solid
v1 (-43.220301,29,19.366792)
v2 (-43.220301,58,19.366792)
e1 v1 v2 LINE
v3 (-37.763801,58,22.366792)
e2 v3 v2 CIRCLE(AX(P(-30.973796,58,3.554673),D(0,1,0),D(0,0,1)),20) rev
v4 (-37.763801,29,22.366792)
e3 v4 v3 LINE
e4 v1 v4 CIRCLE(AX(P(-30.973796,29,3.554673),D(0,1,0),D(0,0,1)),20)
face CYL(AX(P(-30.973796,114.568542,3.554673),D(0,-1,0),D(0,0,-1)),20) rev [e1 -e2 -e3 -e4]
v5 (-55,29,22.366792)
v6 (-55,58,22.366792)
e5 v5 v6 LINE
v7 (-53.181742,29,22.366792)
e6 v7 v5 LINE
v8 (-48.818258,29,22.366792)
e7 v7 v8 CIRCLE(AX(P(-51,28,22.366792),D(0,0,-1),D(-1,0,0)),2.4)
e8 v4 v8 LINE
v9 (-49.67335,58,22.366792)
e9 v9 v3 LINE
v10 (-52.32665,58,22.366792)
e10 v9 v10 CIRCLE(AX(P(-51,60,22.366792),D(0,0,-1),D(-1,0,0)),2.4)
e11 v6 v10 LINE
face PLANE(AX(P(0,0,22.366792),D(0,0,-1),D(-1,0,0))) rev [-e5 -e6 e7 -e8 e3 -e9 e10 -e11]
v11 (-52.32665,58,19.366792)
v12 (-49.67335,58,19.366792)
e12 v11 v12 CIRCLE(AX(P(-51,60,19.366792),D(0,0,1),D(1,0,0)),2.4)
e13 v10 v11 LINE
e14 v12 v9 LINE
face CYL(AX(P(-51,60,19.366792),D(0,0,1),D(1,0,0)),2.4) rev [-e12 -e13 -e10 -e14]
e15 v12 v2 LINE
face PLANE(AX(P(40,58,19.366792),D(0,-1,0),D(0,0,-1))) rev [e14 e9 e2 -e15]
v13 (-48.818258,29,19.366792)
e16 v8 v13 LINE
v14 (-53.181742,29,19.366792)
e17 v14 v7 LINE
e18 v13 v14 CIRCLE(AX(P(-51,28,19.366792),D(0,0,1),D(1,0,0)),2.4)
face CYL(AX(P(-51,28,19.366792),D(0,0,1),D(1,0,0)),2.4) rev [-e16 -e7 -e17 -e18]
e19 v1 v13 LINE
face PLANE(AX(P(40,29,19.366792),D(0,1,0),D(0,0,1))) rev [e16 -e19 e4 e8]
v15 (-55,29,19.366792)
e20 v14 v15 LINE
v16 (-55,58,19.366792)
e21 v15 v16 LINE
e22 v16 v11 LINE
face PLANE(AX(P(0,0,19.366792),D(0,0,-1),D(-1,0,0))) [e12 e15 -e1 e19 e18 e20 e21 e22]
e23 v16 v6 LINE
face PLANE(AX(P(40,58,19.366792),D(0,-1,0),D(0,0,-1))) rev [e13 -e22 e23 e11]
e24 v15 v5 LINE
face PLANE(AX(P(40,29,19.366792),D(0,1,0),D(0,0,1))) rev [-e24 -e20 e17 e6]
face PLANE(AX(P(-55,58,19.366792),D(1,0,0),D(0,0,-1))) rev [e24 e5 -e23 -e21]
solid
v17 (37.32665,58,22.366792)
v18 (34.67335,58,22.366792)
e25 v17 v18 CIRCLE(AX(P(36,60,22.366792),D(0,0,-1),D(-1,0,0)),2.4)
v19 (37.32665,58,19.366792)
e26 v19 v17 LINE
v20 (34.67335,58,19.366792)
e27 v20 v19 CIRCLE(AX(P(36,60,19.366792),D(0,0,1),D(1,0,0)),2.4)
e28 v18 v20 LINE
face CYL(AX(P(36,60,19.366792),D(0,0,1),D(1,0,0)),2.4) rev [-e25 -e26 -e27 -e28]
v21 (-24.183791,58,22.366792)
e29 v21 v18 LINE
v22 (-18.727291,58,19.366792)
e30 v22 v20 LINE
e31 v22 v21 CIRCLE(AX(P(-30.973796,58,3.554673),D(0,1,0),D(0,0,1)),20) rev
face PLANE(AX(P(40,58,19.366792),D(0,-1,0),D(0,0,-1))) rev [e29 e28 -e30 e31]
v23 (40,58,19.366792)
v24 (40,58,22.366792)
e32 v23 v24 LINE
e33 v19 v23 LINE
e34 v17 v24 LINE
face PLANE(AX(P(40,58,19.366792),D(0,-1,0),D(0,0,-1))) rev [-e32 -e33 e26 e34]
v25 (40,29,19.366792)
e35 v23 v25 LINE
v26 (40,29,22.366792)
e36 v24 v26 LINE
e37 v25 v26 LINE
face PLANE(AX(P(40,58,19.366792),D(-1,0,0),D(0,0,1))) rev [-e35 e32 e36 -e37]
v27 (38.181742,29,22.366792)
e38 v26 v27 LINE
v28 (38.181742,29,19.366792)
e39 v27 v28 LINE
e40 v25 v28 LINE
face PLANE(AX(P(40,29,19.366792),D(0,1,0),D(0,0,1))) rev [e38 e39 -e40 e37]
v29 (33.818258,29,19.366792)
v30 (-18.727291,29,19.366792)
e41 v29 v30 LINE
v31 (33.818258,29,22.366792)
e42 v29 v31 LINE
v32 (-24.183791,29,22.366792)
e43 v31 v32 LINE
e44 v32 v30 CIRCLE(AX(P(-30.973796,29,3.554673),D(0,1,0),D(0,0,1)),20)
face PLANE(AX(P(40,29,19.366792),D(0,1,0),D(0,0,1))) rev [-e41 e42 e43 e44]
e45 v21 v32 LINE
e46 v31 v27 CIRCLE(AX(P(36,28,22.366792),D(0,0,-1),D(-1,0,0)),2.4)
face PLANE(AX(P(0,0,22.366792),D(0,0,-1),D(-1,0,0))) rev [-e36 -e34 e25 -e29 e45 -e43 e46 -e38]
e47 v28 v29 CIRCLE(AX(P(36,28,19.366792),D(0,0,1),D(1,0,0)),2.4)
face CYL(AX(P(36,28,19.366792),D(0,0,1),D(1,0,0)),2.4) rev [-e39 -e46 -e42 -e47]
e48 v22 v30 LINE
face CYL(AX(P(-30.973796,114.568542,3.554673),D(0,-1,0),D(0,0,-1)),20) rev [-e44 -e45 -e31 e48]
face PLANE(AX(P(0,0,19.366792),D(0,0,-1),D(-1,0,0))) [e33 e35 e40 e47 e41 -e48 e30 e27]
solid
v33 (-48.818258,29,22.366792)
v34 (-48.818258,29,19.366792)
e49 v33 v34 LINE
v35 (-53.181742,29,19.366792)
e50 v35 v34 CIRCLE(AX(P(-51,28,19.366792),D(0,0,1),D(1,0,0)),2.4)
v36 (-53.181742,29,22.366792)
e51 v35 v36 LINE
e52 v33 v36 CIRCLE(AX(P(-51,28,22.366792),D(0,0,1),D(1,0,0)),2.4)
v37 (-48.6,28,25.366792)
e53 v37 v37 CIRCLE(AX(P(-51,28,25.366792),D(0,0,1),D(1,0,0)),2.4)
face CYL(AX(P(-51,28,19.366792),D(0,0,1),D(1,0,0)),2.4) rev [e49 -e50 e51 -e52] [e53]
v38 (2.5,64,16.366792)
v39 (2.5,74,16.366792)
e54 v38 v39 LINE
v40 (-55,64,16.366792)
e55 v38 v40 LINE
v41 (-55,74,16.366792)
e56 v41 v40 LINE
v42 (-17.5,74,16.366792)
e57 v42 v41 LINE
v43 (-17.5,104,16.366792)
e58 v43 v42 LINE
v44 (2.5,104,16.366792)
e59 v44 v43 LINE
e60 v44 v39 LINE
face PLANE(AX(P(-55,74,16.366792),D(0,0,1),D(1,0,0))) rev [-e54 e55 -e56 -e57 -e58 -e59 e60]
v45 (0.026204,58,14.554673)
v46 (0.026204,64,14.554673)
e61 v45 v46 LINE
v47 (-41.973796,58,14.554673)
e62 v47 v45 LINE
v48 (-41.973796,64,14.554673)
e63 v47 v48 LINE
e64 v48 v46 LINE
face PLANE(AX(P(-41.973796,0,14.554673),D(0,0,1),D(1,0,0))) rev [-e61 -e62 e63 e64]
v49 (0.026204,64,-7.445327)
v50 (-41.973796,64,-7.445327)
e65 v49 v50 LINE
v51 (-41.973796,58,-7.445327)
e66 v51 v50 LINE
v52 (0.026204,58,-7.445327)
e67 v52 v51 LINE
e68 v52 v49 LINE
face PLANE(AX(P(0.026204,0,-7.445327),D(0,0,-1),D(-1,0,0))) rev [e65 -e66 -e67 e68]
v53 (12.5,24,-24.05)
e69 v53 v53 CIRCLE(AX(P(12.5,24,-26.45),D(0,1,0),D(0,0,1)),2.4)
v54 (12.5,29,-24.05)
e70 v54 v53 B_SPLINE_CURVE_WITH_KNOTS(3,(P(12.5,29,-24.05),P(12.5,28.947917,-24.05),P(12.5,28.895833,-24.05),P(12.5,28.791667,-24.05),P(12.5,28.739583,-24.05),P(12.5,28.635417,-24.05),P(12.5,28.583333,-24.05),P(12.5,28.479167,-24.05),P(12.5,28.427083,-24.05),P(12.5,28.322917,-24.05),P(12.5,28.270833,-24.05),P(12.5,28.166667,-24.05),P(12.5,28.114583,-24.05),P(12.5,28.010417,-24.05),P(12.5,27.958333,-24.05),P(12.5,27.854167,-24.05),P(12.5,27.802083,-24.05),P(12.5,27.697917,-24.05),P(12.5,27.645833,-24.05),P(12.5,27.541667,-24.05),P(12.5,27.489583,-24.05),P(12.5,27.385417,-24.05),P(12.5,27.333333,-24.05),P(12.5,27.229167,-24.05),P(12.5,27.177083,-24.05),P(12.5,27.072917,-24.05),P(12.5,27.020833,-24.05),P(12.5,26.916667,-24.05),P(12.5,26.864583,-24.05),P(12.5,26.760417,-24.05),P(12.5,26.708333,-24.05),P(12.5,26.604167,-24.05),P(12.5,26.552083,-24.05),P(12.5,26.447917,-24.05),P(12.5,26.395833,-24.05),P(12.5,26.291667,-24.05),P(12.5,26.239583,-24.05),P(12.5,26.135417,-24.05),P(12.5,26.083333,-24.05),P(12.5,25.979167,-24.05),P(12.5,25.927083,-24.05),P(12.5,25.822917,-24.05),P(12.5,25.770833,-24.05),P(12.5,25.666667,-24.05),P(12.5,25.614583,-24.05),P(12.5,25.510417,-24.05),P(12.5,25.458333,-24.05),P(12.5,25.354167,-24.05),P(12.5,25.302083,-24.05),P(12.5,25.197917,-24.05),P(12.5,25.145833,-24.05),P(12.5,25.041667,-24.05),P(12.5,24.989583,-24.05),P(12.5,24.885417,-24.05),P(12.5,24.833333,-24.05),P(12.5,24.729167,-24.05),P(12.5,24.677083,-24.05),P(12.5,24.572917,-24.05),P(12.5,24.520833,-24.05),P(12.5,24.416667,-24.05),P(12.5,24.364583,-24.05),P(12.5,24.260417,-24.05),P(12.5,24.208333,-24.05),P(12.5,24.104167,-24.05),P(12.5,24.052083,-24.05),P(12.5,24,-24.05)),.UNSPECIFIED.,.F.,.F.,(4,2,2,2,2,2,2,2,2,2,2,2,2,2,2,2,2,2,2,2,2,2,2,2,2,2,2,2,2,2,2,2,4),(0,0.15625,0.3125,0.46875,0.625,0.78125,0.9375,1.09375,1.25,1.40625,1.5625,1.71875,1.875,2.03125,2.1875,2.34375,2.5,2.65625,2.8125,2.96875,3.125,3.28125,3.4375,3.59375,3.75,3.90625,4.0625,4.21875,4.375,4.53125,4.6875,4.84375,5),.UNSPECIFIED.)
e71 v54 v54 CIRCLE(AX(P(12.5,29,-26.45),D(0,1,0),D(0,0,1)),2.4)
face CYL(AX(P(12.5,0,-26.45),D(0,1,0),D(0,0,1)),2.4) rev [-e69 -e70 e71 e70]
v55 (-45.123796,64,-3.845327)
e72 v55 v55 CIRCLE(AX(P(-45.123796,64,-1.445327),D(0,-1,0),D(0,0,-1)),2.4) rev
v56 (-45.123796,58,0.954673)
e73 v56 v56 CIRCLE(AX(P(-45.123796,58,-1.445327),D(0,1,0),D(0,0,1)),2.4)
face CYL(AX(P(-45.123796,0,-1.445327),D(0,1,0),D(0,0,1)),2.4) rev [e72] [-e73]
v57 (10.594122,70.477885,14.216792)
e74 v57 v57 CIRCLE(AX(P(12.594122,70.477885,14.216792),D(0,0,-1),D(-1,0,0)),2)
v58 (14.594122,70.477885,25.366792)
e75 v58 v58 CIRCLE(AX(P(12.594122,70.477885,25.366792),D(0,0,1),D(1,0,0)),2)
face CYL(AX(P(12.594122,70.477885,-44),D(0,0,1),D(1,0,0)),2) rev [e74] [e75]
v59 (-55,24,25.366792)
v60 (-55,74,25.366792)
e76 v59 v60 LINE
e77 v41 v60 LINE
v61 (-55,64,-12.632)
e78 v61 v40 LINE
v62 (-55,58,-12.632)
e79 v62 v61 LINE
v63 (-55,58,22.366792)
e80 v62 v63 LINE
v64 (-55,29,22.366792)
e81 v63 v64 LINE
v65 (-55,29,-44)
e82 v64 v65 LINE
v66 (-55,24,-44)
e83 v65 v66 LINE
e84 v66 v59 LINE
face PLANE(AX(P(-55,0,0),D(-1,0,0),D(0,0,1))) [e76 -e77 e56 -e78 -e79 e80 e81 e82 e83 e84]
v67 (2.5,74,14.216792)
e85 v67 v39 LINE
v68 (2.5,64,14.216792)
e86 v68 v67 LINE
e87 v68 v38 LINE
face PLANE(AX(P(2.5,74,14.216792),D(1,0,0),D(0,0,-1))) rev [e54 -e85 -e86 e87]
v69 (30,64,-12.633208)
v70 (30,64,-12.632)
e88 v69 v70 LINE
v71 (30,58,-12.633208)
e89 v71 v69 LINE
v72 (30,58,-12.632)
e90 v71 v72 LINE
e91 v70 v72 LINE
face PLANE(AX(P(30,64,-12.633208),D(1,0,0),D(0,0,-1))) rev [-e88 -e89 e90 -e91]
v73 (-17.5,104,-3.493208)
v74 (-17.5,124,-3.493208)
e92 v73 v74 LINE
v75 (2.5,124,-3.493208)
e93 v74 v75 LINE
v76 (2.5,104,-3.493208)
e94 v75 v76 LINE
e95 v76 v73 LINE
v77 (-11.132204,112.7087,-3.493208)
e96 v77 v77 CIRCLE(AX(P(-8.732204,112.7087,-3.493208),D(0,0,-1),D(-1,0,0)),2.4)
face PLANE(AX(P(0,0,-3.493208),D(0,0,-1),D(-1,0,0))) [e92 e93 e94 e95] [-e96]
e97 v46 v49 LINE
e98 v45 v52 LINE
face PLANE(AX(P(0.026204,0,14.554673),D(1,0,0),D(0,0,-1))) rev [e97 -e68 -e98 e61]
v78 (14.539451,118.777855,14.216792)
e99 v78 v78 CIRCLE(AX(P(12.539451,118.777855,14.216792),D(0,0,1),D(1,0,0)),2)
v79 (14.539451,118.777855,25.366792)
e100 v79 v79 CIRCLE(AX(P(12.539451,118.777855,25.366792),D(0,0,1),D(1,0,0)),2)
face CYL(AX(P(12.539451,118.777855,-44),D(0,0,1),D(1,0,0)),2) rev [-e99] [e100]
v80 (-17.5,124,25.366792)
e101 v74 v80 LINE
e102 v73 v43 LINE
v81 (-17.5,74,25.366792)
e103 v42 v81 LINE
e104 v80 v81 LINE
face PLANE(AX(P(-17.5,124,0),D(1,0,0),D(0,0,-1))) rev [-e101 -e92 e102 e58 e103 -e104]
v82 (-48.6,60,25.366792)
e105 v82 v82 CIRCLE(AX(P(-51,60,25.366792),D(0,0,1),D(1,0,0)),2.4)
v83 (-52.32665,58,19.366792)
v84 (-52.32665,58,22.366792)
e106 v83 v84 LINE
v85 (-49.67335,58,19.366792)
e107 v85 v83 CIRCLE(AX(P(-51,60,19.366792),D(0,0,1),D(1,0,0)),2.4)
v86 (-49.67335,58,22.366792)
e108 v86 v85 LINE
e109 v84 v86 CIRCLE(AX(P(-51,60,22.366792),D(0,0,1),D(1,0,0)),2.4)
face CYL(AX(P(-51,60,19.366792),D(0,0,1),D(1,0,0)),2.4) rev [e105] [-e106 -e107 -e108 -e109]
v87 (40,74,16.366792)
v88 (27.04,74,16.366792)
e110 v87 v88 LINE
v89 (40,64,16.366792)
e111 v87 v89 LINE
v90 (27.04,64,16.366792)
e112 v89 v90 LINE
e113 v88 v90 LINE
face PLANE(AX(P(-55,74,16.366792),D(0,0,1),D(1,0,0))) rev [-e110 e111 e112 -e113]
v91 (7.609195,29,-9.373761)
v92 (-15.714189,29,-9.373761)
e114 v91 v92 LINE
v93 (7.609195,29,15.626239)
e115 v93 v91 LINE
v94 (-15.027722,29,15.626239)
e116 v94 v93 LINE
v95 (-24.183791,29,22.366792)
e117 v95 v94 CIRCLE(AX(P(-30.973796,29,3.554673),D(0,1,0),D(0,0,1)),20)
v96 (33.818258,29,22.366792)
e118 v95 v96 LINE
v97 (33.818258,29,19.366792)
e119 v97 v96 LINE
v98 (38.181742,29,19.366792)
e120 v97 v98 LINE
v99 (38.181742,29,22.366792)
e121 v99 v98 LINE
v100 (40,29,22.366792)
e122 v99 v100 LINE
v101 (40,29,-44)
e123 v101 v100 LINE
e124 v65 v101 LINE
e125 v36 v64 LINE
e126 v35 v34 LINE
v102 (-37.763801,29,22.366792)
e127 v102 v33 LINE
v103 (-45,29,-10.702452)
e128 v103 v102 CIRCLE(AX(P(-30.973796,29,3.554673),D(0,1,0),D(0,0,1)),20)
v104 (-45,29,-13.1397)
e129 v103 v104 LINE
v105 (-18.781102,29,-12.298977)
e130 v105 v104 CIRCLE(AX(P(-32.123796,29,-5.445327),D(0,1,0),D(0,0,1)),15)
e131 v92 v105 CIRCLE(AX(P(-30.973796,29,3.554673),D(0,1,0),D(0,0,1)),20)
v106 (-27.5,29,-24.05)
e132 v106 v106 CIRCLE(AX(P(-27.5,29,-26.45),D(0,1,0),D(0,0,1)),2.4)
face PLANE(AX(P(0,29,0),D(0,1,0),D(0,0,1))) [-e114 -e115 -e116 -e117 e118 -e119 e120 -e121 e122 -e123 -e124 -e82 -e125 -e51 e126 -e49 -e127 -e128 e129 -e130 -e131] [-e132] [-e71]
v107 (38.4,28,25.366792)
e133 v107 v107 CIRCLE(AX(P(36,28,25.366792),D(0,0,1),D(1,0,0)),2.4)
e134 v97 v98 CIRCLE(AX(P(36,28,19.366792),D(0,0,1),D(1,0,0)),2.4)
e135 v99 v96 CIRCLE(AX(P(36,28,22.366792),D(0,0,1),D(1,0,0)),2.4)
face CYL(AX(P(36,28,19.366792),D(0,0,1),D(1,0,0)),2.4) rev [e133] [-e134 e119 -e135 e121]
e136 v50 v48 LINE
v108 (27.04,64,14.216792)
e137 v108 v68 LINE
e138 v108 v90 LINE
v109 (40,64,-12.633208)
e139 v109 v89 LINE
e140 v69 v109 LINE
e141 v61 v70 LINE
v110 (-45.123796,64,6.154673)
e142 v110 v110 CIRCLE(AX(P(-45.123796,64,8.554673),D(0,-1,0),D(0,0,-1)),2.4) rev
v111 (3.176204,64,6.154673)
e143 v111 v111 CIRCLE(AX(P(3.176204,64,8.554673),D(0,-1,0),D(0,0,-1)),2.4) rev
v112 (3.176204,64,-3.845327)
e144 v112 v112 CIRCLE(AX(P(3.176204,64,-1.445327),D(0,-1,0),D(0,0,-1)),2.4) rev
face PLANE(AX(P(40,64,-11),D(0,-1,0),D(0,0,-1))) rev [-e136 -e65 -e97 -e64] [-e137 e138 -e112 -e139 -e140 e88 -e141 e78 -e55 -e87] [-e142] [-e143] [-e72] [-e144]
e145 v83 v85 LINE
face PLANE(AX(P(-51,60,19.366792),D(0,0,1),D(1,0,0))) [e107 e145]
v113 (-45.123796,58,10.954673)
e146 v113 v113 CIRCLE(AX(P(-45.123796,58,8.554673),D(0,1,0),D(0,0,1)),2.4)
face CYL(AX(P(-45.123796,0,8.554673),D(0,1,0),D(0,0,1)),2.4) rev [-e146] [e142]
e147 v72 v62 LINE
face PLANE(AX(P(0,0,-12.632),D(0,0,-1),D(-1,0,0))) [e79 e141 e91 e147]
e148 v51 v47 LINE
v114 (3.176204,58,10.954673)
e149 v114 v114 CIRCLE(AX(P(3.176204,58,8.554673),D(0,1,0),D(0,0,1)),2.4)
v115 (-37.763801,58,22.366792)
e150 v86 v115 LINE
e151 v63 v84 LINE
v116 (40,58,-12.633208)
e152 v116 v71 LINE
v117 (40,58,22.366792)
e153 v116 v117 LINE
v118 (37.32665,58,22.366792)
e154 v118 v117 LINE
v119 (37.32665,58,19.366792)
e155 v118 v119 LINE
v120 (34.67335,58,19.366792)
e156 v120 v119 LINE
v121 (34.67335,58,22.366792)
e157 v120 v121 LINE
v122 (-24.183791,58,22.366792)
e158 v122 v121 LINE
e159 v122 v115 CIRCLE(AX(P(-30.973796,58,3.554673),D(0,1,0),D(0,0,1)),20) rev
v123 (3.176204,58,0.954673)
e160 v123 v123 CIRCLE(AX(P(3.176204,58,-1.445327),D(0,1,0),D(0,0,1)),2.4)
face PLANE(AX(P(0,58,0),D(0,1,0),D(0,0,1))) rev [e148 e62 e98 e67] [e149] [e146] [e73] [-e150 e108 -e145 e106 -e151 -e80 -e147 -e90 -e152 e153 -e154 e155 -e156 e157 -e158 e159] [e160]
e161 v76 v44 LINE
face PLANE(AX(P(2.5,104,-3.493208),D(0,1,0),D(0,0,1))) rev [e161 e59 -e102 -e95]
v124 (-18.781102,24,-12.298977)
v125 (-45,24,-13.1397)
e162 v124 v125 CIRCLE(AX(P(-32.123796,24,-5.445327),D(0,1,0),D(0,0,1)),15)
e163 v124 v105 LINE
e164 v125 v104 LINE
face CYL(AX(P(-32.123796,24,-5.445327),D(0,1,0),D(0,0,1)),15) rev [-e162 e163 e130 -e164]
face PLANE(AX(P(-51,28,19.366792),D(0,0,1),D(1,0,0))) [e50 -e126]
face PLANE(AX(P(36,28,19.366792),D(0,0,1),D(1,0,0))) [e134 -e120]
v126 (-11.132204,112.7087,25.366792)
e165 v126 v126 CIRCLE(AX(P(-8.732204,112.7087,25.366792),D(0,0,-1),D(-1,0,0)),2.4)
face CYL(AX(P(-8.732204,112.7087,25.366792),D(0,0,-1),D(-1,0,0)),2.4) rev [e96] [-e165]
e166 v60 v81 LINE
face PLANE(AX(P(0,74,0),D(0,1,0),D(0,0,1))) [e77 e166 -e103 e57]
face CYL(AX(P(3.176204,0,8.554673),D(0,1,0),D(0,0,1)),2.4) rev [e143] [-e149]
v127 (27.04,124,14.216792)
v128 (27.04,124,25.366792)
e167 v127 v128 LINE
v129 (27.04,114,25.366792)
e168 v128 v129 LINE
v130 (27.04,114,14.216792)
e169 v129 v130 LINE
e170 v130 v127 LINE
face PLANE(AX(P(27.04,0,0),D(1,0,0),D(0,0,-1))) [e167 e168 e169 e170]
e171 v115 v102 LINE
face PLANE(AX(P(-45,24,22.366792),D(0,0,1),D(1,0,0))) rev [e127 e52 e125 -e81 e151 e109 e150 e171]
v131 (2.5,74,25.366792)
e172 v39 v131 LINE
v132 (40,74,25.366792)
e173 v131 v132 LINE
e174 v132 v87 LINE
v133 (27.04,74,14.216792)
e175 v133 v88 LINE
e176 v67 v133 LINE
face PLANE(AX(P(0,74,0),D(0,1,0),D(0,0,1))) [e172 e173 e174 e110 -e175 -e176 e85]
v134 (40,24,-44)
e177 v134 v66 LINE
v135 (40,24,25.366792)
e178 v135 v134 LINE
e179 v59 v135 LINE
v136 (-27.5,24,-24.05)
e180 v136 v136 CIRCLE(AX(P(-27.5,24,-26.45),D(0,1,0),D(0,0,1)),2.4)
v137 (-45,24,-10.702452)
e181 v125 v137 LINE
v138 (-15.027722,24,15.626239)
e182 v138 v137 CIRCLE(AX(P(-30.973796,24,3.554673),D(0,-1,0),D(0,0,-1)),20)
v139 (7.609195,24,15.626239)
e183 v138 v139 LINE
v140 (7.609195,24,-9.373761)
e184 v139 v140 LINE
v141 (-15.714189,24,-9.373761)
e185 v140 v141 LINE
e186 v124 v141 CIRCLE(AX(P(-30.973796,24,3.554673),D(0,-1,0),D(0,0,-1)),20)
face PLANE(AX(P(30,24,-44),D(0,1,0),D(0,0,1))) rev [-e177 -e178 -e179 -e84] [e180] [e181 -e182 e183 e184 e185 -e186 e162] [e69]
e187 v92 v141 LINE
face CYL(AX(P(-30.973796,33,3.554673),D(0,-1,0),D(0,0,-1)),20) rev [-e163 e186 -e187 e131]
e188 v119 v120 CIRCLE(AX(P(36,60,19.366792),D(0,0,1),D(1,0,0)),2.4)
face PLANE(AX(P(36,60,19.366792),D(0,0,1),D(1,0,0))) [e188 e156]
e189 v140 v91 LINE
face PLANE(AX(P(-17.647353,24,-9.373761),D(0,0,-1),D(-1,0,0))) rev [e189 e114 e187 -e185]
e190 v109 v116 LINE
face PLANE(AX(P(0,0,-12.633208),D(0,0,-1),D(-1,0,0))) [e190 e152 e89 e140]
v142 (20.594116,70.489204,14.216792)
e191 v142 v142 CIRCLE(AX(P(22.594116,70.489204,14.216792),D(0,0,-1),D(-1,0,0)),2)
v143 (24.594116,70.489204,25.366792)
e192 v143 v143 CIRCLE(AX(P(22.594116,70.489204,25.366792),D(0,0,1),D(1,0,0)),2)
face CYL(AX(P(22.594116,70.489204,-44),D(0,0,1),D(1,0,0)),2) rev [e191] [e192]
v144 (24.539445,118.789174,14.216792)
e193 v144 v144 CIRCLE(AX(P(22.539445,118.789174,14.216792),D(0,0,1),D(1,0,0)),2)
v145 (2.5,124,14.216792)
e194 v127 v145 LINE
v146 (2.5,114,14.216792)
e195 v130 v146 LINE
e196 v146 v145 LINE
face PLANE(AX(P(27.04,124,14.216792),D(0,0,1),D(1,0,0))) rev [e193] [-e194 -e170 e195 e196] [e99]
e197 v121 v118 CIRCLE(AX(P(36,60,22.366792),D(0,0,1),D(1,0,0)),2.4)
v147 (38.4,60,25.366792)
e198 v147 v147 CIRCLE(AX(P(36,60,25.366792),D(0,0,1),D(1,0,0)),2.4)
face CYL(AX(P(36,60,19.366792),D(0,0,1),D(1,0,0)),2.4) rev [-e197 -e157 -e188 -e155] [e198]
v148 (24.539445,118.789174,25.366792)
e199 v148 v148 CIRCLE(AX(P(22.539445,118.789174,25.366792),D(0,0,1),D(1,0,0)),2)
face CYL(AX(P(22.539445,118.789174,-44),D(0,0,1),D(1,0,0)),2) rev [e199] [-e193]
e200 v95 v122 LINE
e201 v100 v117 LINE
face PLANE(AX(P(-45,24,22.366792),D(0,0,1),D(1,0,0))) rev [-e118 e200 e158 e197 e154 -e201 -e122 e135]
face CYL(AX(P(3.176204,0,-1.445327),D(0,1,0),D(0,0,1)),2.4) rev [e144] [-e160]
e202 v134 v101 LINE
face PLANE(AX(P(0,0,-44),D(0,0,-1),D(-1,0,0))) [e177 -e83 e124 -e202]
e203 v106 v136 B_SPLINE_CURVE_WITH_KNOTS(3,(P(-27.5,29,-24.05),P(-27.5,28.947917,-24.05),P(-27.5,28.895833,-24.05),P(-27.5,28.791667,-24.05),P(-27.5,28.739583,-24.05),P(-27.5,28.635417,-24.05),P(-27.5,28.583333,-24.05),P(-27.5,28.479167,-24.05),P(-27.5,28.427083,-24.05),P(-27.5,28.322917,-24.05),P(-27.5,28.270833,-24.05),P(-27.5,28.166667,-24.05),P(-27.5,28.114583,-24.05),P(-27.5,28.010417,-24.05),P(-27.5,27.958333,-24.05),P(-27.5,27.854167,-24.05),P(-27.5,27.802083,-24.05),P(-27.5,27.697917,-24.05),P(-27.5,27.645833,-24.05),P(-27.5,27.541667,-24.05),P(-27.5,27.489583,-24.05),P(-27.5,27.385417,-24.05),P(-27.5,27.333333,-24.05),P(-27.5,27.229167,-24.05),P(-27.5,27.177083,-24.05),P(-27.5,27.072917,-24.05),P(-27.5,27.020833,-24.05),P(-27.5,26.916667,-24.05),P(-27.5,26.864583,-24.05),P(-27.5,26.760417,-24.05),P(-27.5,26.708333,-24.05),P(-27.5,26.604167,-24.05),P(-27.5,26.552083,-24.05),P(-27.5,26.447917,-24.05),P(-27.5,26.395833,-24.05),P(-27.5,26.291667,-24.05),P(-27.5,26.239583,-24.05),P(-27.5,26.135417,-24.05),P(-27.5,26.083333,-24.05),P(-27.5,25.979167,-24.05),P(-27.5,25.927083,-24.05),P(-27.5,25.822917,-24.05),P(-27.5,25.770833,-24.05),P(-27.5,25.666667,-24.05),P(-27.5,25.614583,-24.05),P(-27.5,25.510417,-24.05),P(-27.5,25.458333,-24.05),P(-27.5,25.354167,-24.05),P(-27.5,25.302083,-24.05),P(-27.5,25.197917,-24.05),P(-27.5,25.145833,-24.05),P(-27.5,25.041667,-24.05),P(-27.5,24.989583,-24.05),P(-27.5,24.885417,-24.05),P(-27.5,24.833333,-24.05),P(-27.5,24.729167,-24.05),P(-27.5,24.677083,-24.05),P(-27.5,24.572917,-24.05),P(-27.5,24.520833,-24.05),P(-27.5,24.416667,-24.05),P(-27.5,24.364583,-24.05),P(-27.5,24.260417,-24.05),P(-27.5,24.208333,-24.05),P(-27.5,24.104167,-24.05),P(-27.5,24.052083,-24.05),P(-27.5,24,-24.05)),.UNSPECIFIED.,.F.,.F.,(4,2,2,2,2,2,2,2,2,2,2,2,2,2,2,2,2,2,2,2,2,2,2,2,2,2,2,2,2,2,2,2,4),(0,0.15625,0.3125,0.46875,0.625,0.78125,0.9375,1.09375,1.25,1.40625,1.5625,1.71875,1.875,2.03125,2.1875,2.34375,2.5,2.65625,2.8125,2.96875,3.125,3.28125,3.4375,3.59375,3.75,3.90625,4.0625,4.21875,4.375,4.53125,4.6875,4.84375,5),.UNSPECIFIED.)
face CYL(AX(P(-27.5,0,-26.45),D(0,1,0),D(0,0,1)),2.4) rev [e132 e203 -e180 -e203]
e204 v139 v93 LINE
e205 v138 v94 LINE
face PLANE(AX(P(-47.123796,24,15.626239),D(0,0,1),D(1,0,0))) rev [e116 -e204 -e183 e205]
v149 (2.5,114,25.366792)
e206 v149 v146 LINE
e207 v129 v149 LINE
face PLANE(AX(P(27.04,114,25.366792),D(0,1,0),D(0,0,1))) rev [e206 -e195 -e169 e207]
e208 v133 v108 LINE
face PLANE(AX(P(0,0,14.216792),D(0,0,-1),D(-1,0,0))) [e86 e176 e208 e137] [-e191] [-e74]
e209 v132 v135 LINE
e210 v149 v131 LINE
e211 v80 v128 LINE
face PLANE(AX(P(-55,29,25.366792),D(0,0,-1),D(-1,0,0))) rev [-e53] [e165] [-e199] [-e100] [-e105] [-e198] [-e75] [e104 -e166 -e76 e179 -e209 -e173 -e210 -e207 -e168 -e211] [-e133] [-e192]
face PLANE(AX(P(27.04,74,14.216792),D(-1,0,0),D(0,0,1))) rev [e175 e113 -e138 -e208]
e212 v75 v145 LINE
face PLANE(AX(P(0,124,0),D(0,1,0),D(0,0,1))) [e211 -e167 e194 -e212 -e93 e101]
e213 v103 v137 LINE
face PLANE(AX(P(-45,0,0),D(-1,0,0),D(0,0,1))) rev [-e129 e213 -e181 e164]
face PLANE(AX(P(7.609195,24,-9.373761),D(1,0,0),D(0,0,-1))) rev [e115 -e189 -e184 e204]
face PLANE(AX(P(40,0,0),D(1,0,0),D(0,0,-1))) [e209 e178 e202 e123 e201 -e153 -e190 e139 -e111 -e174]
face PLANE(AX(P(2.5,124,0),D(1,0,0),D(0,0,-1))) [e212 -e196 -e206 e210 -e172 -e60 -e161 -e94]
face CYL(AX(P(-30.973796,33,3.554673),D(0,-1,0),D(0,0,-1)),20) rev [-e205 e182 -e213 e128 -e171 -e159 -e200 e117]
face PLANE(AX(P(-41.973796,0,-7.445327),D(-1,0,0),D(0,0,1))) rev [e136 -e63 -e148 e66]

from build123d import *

# Parameters (mm, degrees)
SKETCH1_W            = 75
SKETCH1_H            = 45
BOSS_EXTRUDE1_DEPTH  = 5
SKETCH3_W            = 75
SKETCH3_H            = 4
BOSS_EXTRUDE3_DEPTH  = 24
SKETCH4_W            = 75
SKETCH4_H            = 5
BOSS_EXTRUDE4_DEPTH  = 24
SKETCH9_R            = 2.4
CUT_EXTRUDE3_DEPTH   = 70.296464556
CHAMFER1_SIZE        = 5
CHAMFER2_SIZE        = 5
BOSS_EXTRUDE6_START  = 63
SKETCH13_W           = 75
SKETCH13_H           = 36.366792108
BOSS_EXTRUDE6_DEPTH  = 10
SKETCH14_R           = 2.4
CUT_EXTRUDE5_DEPTH   = 93.655275079
SKETCH15_W           = 42
SKETCH15_H           = 22
CUT_EXTRUDE6_DEPTH   = 93.655275079
SKETCH16_W           = 75
SKETCH16_H           = 5
BOSS_EXTRUDE7_DEPTH  = 39
SKETCH17_W           = 69
SKETCH17_H           = 24
CUT_EXTRUDE7_DEPTH   = 111.385687478
SKETCH18_W           = 75
SKETCH18_H           = 3
BOSS_EXTRUDE8_DEPTH  = 34
CUT_EXTRUDE8_DEPTH   = 75.040529442
SKETCH21_R           = 20
CUT_EXTRUDE9_DEPTH   = 9
SKETCH23_W           = 69.366792108
SKETCH23_H           = 5
BOSS_EXTRUDE9_DEPTH  = 10
SKETCH24_W           = 36.366792108
SKETCH24_H           = 10
BOSS_EXTRUDE10_DEPTH = 10
SKETCH25_R           = 2.4
CUT_EXTRUDE10_DEPTH  = 10
SKETCH26_R           = 20
CUT_EXTRUDE11_DEPTH  = 10
SKETCH27_W           = 69.366792108
SKETCH27_H           = 5
BOSS_EXTRUDE11_DEPTH = 10
SKETCH28_W           = 36.366792108
SKETCH28_H           = 4
CUT_EXTRUDE12_DEPTH  = 125.839897469
SKETCH29_W           = 95
SKETCH29_H           = 40
BOSS_EXTRUDE13_DEPTH = 3
SKETCH30_W           = 10
SKETCH30_H           = 6
BOSS_EXTRUDE14_DEPTH = 35
SKETCH31_W           = 85
SKETCH31_H           = 6
BOSS_EXTRUDE15_DEPTH = 1.632
SKETCH34_R           = 2.4
CUT_EXTRUDE13_DEPTH  = 6
SKETCH35_W           = 95
SKETCH35_H           = 29
BOSS_EXTRUDE18_DEPTH = 3
SKETCH37_R           = 20
CUT_EXTRUDE14_DEPTH  = 34
SKETCH38_R           = 2.4
CUT_EXTRUDE15_DEPTH  = 6
SKETCH39_W           = 95
SKETCH39_H           = 9
BOSS_EXTRUDE19_DEPTH = 10
SKETCH54_W           = 10
SKETCH54_H           = 9
BOSS_EXTRUDE29_DEPTH = 50
SKETCH55_W           = 20
SKETCH55_H           = 20
BOSS_EXTRUDE30_DEPTH = 19.86
SKETCH56_R           = 2.4
CUT_EXTRUDE18_DEPTH  = 142.569065148
SKETCH57_W           = 11.15
SKETCH57_H           = 10
BOSS_EXTRUDE31_DEPTH = 24.54
SKETCH58_W           = 24.54
SKETCH58_H           = 10
BOSS_EXTRUDE32_DEPTH = 2.15
SKETCH59_R           = 2
CUT_EXTRUDE19_DEPTH  = 153.357316357


with BuildPart() as part:
    # Sketch1 → Boss-Extrude1 (new body)
    with BuildSketch(Plane(origin=(0, 0, 0), x_dir=(1, 0, 0), z_dir=(0, 1, 0))):
        with Locations((-7.5, -2.5)):
            Rectangle(SKETCH1_W, SKETCH1_H)
    extrude(amount=BOSS_EXTRUDE1_DEPTH)

    # Sketch3 → Boss-Extrude3 (add)
    with BuildSketch(Plane(origin=(0, 5, 0), x_dir=(1, 0, 0), z_dir=(0, 1, 0))):
        with Locations((-7.5, 18)):
            Rectangle(SKETCH3_W, SKETCH3_H)
    extrude(amount=BOSS_EXTRUDE3_DEPTH)

    # Sketch4 → Boss-Extrude4 (add)
    with BuildSketch(Plane(origin=(0, 0, -20), x_dir=(-1, 0, 0), z_dir=(0, 0, -1))):
        with Locations((7.5, 26.5)):
            Rectangle(SKETCH4_W, SKETCH4_H)
    extrude(amount=BOSS_EXTRUDE4_DEPTH)

    # Sketch9 → Cut-Extrude3 (cut, through all)
    with BuildSketch(Plane(origin=(0, 29, 0), x_dir=(1, 0, 0), z_dir=(0, 1, 0))):
        with Locations(Location((-27.5, 26.45, 0), (0, 0, 270))):
            Circle(SKETCH9_R)
        with Locations(Location((12.5, 26.45, 0), (0, 0, 270))):
            Circle(SKETCH9_R)
    extrude(amount=-CUT_EXTRUDE3_DEPTH, mode=Mode.SUBTRACT)

    # Chamfer1
    chamfer1_edges = [part.edges().sort_by_distance(p)[0] for p in [
        (-7.5, 5, -16),
    ]]
    chamfer(chamfer1_edges, length=CHAMFER1_SIZE)

    # Chamfer2
    # the kernel refuses this chamfer: 5 mm, written as the material it adds along each edge
    with BuildSketch(Plane(origin=(-45, 24, -20), x_dir=(0, -0.9996219169112968, 0.027495876610586317), z_dir=(1, 0, 0))) as chamfer2_piece_1_section:
        Polygon((CHAMFER2_SIZE * 0.999621916911, CHAMFER2_SIZE * 0.0274958766106), (-CHAMFER2_SIZE * 0.0274958766106, CHAMFER2_SIZE * 0.999621916911), (0, 0), align=None)
    chamfer2_piece_1 = extrude(amount=75, mode=Mode.PRIVATE)
    chamfer2_piece_1 = chamfer2_piece_1 - Plane(origin=(12.5, 22.346344927, -26.45), x_dir=(0, 0, 1), z_dir=(0, 1, 0)) * Cylinder(2.4, 170, mode=Mode.PRIVATE)
    chamfer2_piece_1 = chamfer2_piece_1 - Plane(origin=(-27.5, 22.346344927, -26.45), x_dir=(0, 0, 1), z_dir=(0, 1, 0)) * Cylinder(2.4, 170, mode=Mode.PRIVATE)
    add(chamfer2_piece_1)

    # Sketch16 → Boss-Extrude7 (add)
    with BuildSketch(Plane.XY.offset(-16)):
        with Locations((-7.5, 26.5)):
            Rectangle(SKETCH16_W, SKETCH16_H)
    extrude(amount=BOSS_EXTRUDE7_DEPTH)

    # Sketch17 → Cut-Extrude7 (cut, through all)
    with BuildSketch(Plane.ZY.offset(45)):
        with Locations((-9.5, 12)):
            Rectangle(SKETCH17_W, SKETCH17_H)
    extrude(amount=-CUT_EXTRUDE7_DEPTH, mode=Mode.SUBTRACT)

    # Sketch20 → Cut-Extrude8 (cut, through all)
    with BuildSketch(Plane(origin=(0, 29, 0), x_dir=(1, 0, 0), z_dir=(0, 1, 0))):
        with BuildLine():
            Line((-47.123796028, 5.445327082), (-47.123796028, -15.626239287))
            Line((-47.123796028, -15.626239287), (7.609194621, -15.626239287))
            Line((7.609194621, -15.626239287), (7.609194621, 9.373760713))
            Line((7.609194621, 9.373760713), (-17.647352776, 9.373760713))
            ThreePointArc((-17.647352776, 9.373760713), (-34.105380145, 20.313861791), (-47.123796028, 5.445327082))
        make_face()
    extrude(amount=-CUT_EXTRUDE8_DEPTH, mode=Mode.SUBTRACT)


with BuildPart() as body_2:
    # Sketch13 → Boss-Extrude6 (new body)
    with BuildSketch(Plane(origin=(0, 5, 0), x_dir=(1, 0, 0), z_dir=(0, 1, 0)).offset(BOSS_EXTRUDE6_START)):
        with Locations((-7.5, -7.183396054)):
            Rectangle(SKETCH13_W, SKETCH13_H)
    extrude(amount=-BOSS_EXTRUDE6_DEPTH)

    # Sketch14 → Cut-Extrude5 (cut, through all)
    with BuildSketch(Plane(origin=(0, 68, 0), x_dir=(1, 0, 0), z_dir=(0, 1, 0))):
        with Locations((-45.123796028, -8.554672918)):
            Circle(SKETCH14_R)
        with Locations((-45.123796028, 1.445327082)):
            Circle(SKETCH14_R)
        with Locations(Location((3.176203972, 1.445327082, 0), (0, 0, 270))):
            Circle(SKETCH14_R)
        with Locations(Location((3.176203972, -8.554672918, 0), (0, 0, 270))):
            Circle(SKETCH14_R)
    extrude(amount=-CUT_EXTRUDE5_DEPTH, mode=Mode.SUBTRACT)

    # Sketch15 → Cut-Extrude6 (cut, through all)
    with BuildSketch(Plane(origin=(0, 68, 0), x_dir=(1, 0, 0), z_dir=(0, 1, 0))):
        with Locations((-20.973796028, -3.554672918)):
            Rectangle(SKETCH15_W, SKETCH15_H)
    extrude(amount=-CUT_EXTRUDE6_DEPTH, mode=Mode.SUBTRACT)

    # Sketch18 → Boss-Extrude8 (add)
    with BuildSketch(Plane.XZ.offset(-58)):
        with Locations((-7.5, 23.866792108)):
            Rectangle(SKETCH18_W, SKETCH18_H)
    extrude(amount=BOSS_EXTRUDE8_DEPTH)


with BuildPart() as cut_extrude9_tool:
    # Sketch21 → Cut-Extrude9 (new body)
    with BuildSketch(Plane(origin=(0, 24, 0), x_dir=(-1, 0, 0), z_dir=(0, -1, 0))):
        with Locations((30.973796028, -3.554672918)):
            Circle(SKETCH21_R)
    extrude(amount=-CUT_EXTRUDE9_DEPTH)


with BuildPart() as part_1:
    add(part.part)

    # Cut-Extrude9: cut by cut_extrude9_tool
    add(cut_extrude9_tool.part, mode=Mode.SUBTRACT)



with BuildPart() as body_2_1:
    add(body_2.part)

    # Cut-Extrude9: cut by cut_extrude9_tool
    add(cut_extrude9_tool.part, mode=Mode.SUBTRACT)


with BuildPart() as part_2:
    add(part_1.part)

    add(body_2_1.part)  # Boss-Extrude9 merges body 2
    # Sketch23 → Boss-Extrude9 (add)
    with BuildSketch(Plane.ZY.offset(45)):
        with Locations((-9.316603946, 26.5)):
            Rectangle(SKETCH23_W, SKETCH23_H)
    extrude(amount=BOSS_EXTRUDE9_DEPTH)

    # Sketch24 → Boss-Extrude10 (add)
    with BuildSketch(Plane.ZY.offset(45)):
        with Locations((7.183396054, 63)):
            Rectangle(SKETCH24_W, SKETCH24_H)
    extrude(amount=BOSS_EXTRUDE10_DEPTH)

    # Sketch25 → Cut-Extrude10 (cut)
    with BuildSketch(Plane(origin=(0, 68, 0), x_dir=(1, 0, 0), z_dir=(0, 1, 0))):
        with Locations(Location((3.176203972, 1.445327082, 0), (0, 0, 270))):
            Circle(SKETCH25_R)
        with Locations(Location((3.176203972, -8.554672918, 0), (0, 0, 270))):
            Circle(SKETCH25_R)
        with Locations(Location((-45.123796028, 1.445327082, 0), (0, 0, 270))):
            Circle(SKETCH25_R)
        with Locations(Location((-45.123796028, -8.554672918, 0), (0, 0, 270))):
            Circle(SKETCH25_R)
    extrude(amount=-CUT_EXTRUDE10_DEPTH, mode=Mode.SUBTRACT)

    # Sketch26 → Cut-Extrude11 (cut)
    with BuildSketch(Plane.XZ.offset(-24)):
        with Locations((-30.973796028, 3.554672918)):
            Circle(SKETCH26_R)
    extrude(amount=-CUT_EXTRUDE11_DEPTH, mode=Mode.SUBTRACT)

    # Sketch27 → Boss-Extrude11 (add)
    with BuildSketch(Plane(origin=(30, 0, 0), x_dir=(0, 0, -1), z_dir=(1, 0, 0))):
        with Locations((9.316603946, 26.5)):
            Rectangle(SKETCH27_W, SKETCH27_H)
    extrude(amount=BOSS_EXTRUDE11_DEPTH)

    # Sketch28 → Cut-Extrude12 (cut, through all)
    with BuildSketch(Plane.ZY.offset(55)):
        with Locations((7.183396054, 66)):
            Rectangle(SKETCH28_W, SKETCH28_H)
    extrude(amount=-CUT_EXTRUDE12_DEPTH, mode=Mode.SUBTRACT)

    # Sketch29 → Boss-Extrude13 (add)
    with BuildSketch(Plane.XY.offset(25.366792108)):
        with Locations((-7.5, 44)):
            Rectangle(SKETCH29_W, SKETCH29_H)
    extrude(amount=-BOSS_EXTRUDE13_DEPTH)

    # Sketch30 → Boss-Extrude14 (add)
    with BuildSketch(Plane(origin=(0, 0, 22.366792108), x_dir=(-1, 0, 0), z_dir=(0, 0, -1))):
        with Locations((-35, 61)):
            Rectangle(SKETCH30_W, SKETCH30_H)
    extrude(amount=BOSS_EXTRUDE14_DEPTH)

    # Sketch31 → Boss-Extrude15 (add)
    with BuildSketch(Plane(origin=(0, 0, -11), x_dir=(-1, 0, 0), z_dir=(0, 0, -1))):
        with Locations((12.5, 61)):
            Rectangle(SKETCH31_W, SKETCH31_H)
    extrude(amount=BOSS_EXTRUDE15_DEPTH)

    # Sketch34 → Cut-Extrude13 (cut)
    with BuildSketch(Plane.XY.offset(25.366792108)):
        with Locations((-51, 60)):
            Circle(SKETCH34_R)
        with Locations((36, 60)):
            Circle(SKETCH34_R)
        with Locations((-51, 28)):
            Circle(SKETCH34_R)
        with Locations((36, 28)):
            Circle(SKETCH34_R)
    extrude(amount=-CUT_EXTRUDE13_DEPTH, mode=Mode.SUBTRACT)


with BuildPart() as body_2_2:
    # Sketch35 → Boss-Extrude18 (new body)
    with BuildSketch(Plane(origin=(0, 0, 22.366792108), x_dir=(-1, 0, 0), z_dir=(0, 0, -1))):
        with Locations((7.5, 43.5)):
            Rectangle(SKETCH35_W, SKETCH35_H)
    extrude(amount=BOSS_EXTRUDE18_DEPTH)


with BuildPart() as cut_extrude14_tool:
    # Sketch37 → Cut-Extrude14 (new body)
    with BuildSketch(Plane.XZ.offset(-24)):
        with Locations((-30.973796028, 3.554672918)):
            Circle(SKETCH37_R)
    extrude(amount=-CUT_EXTRUDE14_DEPTH)


with BuildPart() as part_3:
    add(part_2.part)

    # Cut-Extrude14: cut by cut_extrude14_tool
    add(cut_extrude14_tool.part, mode=Mode.SUBTRACT)

    # Sketch39 → Boss-Extrude19 (add)
    with BuildSketch(Plane(origin=(0, 64, 0), x_dir=(1, 0, 0), z_dir=(0, 1, 0))):
        with Locations((-7.5, -20.866792108)):
            Rectangle(SKETCH39_W, SKETCH39_H)
    extrude(amount=BOSS_EXTRUDE19_DEPTH)

    # Sketch54 → Boss-Extrude29 (add)
    with BuildSketch(Plane(origin=(0, 74, 0), x_dir=(1, 0, 0), z_dir=(0, 1, 0))):
        with Locations((-12.5, -20.866792108)):
            Rectangle(SKETCH54_W, SKETCH54_H)
        with Locations((-2.5, -20.866792108)):
            Rectangle(SKETCH54_W, SKETCH54_H)
    extrude(amount=BOSS_EXTRUDE29_DEPTH)

    # Sketch55 → Boss-Extrude30 (add)
    with BuildSketch(Plane(origin=(0, 0, 16.366792108), x_dir=(-1, 0, 0), z_dir=(0, 0, -1))):
        with Locations((7.5, 114)):
            Rectangle(SKETCH55_W, SKETCH55_H)
    extrude(amount=BOSS_EXTRUDE30_DEPTH)

    # Sketch56 → Cut-Extrude18 (cut, through all)
    with BuildSketch(Plane(origin=(0, 0, -3.493207892), x_dir=(-1, 0, 0), z_dir=(0, 0, -1))):
        with Locations((8.732204083, 112.708699922)):
            Circle(SKETCH56_R)
    extrude(amount=-CUT_EXTRUDE18_DEPTH, mode=Mode.SUBTRACT)

    # Sketch57 → Boss-Extrude31 (add)
    with BuildSketch(Plane(origin=(2.5, 0, 0), x_dir=(0, 0, -1), z_dir=(1, 0, 0))):
        with Locations((-19.791792108, 119)):
            Rectangle(SKETCH57_W, SKETCH57_H)
    extrude(amount=BOSS_EXTRUDE31_DEPTH)

    # Sketch58 → Boss-Extrude32 (add)
    with BuildSketch(Plane(origin=(0, 0, 16.366792108), x_dir=(-1, 0, 0), z_dir=(0, 0, -1))):
        with Locations((-14.77, 69)):
            Rectangle(SKETCH58_W, SKETCH58_H)
    extrude(amount=BOSS_EXTRUDE32_DEPTH)

    # Sketch59 → Cut-Extrude19 (cut, through all)
    with BuildSketch(Plane.XY.offset(25.366792108)):
        with Locations((12.539451267, 118.777854509)):
            Circle(SKETCH59_R)
        with Locations((22.539444861, 118.78917354)):
            Circle(SKETCH59_R)
        with Locations((12.594122185, 70.47788545)):
            Circle(SKETCH59_R)
        with Locations((22.594115779, 70.489204481)):
            Circle(SKETCH59_R)
    extrude(amount=-CUT_EXTRUDE19_DEPTH, mode=Mode.SUBTRACT)


with BuildPart() as body_2_2_1:
    add(body_2_2.part)

    # Cut-Extrude14: cut by cut_extrude14_tool
    add(cut_extrude14_tool.part, mode=Mode.SUBTRACT)

    # Sketch38 → Cut-Extrude15 (cut)
    with BuildSketch(Plane.XY.offset(25.366792108)):
        with Locations((36, 28)):
            Circle(SKETCH38_R)
        with Locations((-51, 28)):
            Circle(SKETCH38_R)
        with Locations((36, 60)):
            Circle(SKETCH38_R)
        with Locations((-51, 60)):
            Circle(SKETCH38_R)
    extrude(amount=-CUT_EXTRUDE15_DEPTH, mode=Mode.SUBTRACT)


solid = Compound([part_3.part, body_2_2_1.part])
